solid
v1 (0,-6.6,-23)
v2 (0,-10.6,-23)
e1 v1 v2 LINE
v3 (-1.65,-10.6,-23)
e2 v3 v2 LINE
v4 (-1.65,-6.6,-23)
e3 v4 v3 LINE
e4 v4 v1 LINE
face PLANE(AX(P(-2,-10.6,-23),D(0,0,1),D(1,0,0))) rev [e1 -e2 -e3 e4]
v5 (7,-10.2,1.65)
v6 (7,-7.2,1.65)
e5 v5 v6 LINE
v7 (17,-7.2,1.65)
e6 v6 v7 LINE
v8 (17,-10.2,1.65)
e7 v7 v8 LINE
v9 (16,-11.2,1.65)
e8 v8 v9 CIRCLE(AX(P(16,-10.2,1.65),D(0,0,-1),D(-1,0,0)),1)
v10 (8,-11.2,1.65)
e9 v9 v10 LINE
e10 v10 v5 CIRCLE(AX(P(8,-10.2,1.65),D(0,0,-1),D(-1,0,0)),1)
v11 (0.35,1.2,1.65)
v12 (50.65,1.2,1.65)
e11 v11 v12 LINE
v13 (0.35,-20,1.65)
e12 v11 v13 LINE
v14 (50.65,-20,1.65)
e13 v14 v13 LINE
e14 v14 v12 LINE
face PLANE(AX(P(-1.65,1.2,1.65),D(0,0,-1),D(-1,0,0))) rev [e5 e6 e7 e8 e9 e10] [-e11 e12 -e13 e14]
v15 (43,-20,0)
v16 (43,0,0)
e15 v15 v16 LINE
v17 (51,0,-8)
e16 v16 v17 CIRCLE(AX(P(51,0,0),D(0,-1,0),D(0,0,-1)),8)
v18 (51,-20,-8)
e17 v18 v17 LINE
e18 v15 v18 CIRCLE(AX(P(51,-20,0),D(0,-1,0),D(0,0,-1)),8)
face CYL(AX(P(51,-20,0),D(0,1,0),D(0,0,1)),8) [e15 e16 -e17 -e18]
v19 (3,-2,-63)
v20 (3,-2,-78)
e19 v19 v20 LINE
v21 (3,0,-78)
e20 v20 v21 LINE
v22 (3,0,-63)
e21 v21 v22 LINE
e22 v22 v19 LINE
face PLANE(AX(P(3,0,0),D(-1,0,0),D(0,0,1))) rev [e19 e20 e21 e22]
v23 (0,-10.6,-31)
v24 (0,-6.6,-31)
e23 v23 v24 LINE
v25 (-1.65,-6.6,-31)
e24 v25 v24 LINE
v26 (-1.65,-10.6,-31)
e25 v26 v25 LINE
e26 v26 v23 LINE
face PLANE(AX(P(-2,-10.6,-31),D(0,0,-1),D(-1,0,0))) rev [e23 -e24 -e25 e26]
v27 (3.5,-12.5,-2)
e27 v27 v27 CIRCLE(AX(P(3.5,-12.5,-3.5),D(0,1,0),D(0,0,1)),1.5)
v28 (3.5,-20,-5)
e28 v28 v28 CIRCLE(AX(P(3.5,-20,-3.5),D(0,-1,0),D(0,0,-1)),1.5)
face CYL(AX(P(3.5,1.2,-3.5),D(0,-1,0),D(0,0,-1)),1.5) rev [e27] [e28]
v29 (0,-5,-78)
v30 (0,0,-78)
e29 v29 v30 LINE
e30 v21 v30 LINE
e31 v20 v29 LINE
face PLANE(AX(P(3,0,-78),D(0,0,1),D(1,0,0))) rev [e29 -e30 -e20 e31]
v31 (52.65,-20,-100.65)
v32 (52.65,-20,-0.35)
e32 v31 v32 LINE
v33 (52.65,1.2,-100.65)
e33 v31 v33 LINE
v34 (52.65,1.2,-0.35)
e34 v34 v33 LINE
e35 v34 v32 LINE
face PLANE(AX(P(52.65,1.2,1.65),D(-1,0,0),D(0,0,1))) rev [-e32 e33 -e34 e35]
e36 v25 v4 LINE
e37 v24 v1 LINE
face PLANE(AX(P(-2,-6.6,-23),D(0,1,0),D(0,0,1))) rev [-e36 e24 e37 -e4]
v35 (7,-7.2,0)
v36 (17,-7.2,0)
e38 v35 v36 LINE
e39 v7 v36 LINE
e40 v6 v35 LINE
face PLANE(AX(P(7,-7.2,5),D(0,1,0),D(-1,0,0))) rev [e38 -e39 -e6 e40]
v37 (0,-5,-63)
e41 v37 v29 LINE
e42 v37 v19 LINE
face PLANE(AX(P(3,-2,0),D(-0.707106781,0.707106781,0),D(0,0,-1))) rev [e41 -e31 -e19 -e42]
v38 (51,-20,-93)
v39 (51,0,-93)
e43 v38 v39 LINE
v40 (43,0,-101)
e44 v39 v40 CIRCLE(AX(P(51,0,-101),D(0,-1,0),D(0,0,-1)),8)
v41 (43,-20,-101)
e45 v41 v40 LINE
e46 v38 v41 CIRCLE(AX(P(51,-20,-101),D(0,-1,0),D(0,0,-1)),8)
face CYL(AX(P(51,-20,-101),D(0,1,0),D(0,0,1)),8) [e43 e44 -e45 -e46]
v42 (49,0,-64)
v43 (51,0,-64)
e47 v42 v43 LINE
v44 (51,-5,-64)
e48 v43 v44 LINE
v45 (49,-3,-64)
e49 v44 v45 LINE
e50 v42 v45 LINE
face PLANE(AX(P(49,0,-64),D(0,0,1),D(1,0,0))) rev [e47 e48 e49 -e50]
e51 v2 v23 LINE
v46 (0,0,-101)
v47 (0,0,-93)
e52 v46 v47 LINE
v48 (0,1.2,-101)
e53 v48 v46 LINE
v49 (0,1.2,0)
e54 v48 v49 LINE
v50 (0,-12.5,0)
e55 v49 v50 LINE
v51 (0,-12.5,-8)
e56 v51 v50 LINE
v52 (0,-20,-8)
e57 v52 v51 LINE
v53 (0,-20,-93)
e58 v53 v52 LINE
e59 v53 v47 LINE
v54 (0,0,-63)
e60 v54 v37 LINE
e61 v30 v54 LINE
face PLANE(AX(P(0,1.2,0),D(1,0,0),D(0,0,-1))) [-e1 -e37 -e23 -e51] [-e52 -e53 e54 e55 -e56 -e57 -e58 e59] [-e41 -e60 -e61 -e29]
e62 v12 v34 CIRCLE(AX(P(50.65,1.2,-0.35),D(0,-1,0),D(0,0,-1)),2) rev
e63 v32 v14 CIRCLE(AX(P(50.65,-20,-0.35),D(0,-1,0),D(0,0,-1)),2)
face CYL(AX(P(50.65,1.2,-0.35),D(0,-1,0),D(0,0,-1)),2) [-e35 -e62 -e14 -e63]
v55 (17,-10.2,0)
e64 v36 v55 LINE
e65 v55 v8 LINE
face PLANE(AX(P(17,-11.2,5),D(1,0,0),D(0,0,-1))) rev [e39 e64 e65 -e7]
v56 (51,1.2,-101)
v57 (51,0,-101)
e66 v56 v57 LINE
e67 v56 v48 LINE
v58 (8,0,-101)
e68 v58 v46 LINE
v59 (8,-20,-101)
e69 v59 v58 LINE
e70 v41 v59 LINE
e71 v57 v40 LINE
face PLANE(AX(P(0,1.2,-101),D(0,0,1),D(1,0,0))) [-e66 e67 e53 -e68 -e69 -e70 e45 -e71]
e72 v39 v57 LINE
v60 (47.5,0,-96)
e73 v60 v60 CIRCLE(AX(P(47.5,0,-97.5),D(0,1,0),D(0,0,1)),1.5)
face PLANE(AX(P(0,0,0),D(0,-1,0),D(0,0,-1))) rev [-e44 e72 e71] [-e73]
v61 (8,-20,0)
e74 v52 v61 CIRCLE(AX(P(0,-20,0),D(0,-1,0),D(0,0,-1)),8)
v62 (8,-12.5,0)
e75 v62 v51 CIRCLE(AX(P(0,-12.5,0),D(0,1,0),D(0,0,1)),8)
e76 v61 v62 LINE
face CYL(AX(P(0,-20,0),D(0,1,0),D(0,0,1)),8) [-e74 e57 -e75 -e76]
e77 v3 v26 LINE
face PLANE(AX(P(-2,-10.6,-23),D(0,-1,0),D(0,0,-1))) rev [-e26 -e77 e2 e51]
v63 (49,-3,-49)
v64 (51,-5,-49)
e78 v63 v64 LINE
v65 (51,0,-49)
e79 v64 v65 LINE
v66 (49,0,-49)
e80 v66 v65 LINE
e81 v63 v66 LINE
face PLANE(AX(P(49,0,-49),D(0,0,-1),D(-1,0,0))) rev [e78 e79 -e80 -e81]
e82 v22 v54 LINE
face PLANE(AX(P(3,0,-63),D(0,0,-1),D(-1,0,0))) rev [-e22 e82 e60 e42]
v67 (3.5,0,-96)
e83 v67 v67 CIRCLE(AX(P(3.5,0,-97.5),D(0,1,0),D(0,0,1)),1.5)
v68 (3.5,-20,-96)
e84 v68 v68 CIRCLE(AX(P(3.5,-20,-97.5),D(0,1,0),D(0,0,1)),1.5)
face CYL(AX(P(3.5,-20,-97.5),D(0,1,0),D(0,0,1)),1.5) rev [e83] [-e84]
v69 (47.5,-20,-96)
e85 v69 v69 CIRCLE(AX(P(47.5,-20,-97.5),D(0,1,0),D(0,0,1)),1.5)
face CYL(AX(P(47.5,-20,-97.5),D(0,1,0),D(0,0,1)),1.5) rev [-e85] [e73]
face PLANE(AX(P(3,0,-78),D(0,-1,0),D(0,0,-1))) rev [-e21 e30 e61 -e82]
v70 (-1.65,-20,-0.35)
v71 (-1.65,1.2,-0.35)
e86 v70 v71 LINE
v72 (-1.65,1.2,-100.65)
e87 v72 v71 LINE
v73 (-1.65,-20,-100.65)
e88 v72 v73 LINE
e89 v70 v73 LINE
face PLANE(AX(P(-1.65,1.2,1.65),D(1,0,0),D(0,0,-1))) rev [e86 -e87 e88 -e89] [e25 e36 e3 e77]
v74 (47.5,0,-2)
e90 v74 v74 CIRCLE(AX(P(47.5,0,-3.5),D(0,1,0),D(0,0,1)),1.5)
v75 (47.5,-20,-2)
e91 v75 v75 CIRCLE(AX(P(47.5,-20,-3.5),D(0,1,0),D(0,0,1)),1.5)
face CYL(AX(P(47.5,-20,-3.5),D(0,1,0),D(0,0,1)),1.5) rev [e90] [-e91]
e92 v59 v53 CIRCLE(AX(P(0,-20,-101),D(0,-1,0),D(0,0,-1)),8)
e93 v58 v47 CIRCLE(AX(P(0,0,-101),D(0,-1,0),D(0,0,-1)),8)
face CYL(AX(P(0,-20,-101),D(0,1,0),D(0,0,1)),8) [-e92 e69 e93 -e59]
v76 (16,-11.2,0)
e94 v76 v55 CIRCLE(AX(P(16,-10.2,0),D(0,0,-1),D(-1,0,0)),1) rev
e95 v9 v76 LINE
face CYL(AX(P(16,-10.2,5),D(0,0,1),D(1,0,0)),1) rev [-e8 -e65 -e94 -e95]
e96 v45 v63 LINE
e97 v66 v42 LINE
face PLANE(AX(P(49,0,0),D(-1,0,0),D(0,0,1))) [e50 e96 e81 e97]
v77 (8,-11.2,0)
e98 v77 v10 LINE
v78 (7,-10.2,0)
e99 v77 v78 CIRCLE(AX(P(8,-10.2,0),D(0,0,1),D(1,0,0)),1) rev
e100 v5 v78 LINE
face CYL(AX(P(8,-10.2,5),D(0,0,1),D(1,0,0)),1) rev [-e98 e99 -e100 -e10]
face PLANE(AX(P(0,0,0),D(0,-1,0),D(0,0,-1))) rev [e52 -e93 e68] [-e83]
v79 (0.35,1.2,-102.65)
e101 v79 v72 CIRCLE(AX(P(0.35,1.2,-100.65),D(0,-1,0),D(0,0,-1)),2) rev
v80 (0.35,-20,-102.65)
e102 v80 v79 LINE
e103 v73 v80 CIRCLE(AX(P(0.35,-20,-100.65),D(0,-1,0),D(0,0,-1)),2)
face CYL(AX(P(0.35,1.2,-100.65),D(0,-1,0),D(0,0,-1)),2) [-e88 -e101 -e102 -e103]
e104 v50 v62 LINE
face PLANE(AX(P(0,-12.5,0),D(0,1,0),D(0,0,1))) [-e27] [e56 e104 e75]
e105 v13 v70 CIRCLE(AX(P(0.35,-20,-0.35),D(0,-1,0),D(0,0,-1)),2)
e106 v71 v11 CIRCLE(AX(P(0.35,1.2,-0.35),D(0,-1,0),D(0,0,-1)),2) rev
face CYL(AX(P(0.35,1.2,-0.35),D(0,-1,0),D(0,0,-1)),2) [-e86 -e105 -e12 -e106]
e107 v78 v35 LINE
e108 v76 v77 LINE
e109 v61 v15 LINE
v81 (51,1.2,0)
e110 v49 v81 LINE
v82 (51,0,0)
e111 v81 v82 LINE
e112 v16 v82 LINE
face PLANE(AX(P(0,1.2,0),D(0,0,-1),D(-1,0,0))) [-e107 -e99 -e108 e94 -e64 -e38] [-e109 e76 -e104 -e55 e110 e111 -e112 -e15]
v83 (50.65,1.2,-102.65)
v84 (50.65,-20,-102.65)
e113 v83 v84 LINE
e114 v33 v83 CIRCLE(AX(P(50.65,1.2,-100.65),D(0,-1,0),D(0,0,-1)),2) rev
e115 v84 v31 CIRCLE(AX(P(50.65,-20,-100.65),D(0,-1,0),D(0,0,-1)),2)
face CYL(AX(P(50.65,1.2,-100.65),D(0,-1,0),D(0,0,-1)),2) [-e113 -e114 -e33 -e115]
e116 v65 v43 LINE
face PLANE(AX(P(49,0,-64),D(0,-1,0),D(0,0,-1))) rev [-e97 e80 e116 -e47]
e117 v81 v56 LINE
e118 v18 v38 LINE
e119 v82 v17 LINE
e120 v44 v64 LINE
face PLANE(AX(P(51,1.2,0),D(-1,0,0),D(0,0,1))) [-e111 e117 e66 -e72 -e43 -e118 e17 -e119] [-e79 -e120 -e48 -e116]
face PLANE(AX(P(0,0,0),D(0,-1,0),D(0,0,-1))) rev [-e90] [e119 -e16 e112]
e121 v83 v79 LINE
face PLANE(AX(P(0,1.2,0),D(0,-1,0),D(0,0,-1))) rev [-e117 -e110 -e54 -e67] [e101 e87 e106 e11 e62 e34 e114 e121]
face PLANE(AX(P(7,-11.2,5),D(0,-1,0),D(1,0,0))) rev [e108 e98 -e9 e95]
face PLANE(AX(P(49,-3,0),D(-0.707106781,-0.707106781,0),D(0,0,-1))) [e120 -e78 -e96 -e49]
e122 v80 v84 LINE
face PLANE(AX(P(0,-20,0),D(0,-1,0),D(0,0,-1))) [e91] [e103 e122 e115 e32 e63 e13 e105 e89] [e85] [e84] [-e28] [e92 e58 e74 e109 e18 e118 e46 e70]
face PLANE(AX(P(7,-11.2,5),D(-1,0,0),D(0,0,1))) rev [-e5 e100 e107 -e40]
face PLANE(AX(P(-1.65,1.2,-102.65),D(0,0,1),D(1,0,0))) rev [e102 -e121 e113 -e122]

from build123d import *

# Parameters (mm, degrees)
SKICA1_W                 = 54.3
SKICA1_H                 = 104.3
SKICA1_W_2               = 51
SKICA1_H_2               = 101
P_IDAT_VYSUNUT_M1_DEPTH  = 1.2
SKICA2_W                 = 54.3
SKICA2_H                 = 104.3
P_IDAT_VYSUNUT_M2_DEPTH  = 20
SKICA3_R                 = 1.5
ODEBRAT_VYSUNUT_M1_DEPTH = 118.085631057
SKICA5_W                 = 8
SKICA5_H                 = 4
ODEBRAT_VYSUNUT_M2_DEPTH = 2
SKICA6_W                 = 10
SKICA6_H                 = 4
ODEBRAT_VYSUNUT_M3_DEPTH = 5
SKICA9_W                 = 15
SKICA9_H                 = 5
P_IDAT_VYSUNUT_M4_DEPTH  = 2
ZKOSEN_1_SIZE            = 2
SKICA10_W                = 15
SKICA10_H                = 5
P_IDAT_VYSUNUT_M5_DEPTH  = 3
ZKOSEN_2_SIZE            = 3
ZAOBLIT2_R               = 1
ZAOBLIT3_R               = 2
ODEBRAT_VYSUNUT_M5_DEPTH = 12.5
SKICA12_R                = 1.5
ODEBRAT_VYSUNUT_M6_DEPTH = 118.296568577


with BuildPart() as part:
    # Skica1 → Přidat vysunutím1 (new body)
    with BuildSketch(Plane(origin=(0, 0, 0), x_dir=(1, 0, 0), z_dir=(0, 1, 0))):
        with Locations((25.5, 50.5)):
            Rectangle(SKICA1_W, SKICA1_H)
        with Locations((25.5, 50.5)):
            Rectangle(SKICA1_W_2, SKICA1_H_2, mode=Mode.SUBTRACT)
    extrude(amount=P_IDAT_VYSUNUT_M1_DEPTH)

    # Skica2 → Přidat vysunutím2 (add)
    # profile 1 of 5: a face of its own
    with BuildSketch(Plane.XZ):
        with Locations((25.5, -50.5)):
            Rectangle(SKICA2_W, SKICA2_H)
        Polygon((0, -8), (0, 0), (8, 0), (43, 0), (51, 0), (51, -8), (51, -93), (51, -101), (43, -101), (8, -101), (0, -101), (0, -93), align=None, mode=Mode.SUBTRACT)
    # profile 2 of 5: a face of its own
    with BuildSketch(Plane.XZ):
        with BuildLine():
            Line((8, 0), (0, 0))
            Line((0, 0), (0, -8))
            ThreePointArc((0, -8), (5.656854249, -5.656854249), (8, 0))
        make_face()
    # profile 3 of 5: a face of its own
    with BuildSketch(Plane.XZ):
        with BuildLine():
            ThreePointArc((8, -101), (5.656854249, -95.343145751), (0, -93))
            Line((0, -93), (0, -101))
            Line((0, -101), (8, -101))
        make_face()
    # profile 4 of 5: a face of its own
    with BuildSketch(Plane.XZ):
        with BuildLine():
            Line((51, -101), (51, -93))
            ThreePointArc((51, -93), (45.343145751, -95.343145751), (43, -101))
            Line((43, -101), (51, -101))
        make_face()
    # profile 5 of 5: a face of its own
    with BuildSketch(Plane.XZ):
        with BuildLine():
            Line((51, 0), (43, 0))
            ThreePointArc((43, 0), (45.343145751, -5.656854249), (51, -8))
            Line((51, -8), (51, 0))
        make_face()
    extrude(amount=P_IDAT_VYSUNUT_M2_DEPTH)

    # Skica3 → Odebrat vysunutím1 (cut, through all)
    with BuildSketch(Plane(origin=(0, 0, 0), x_dir=(1, 0, 0), z_dir=(0, 1, 0))):
        with Locations(Location((3.5, 97.5, 0), (0, 0, 270))):
            Circle(SKICA3_R)
        with Locations(Location((47.5, 97.5, 0), (0, 0, 270))):
            Circle(SKICA3_R)
        with Locations(Location((47.5, 3.5, 0), (0, 0, 270))):
            Circle(SKICA3_R)
    extrude(amount=-ODEBRAT_VYSUNUT_M1_DEPTH, mode=Mode.SUBTRACT)

    # Skica5 → Odebrat vysunutím2 (cut)
    with BuildSketch(Plane(origin=(0, 0, 0), x_dir=(0, 0, -1), z_dir=(1, 0, 0))):
        with Locations((27, -8.6)):
            Rectangle(SKICA5_W, SKICA5_H)
    extrude(amount=-ODEBRAT_VYSUNUT_M2_DEPTH, mode=Mode.SUBTRACT)

    # Skica6 → Odebrat vysunutím3 (cut, symmetric)
    with BuildSketch(Plane(origin=(0, 0, 0), x_dir=(-1, 0, 0), z_dir=(0, 0, -1))):
        with Locations((-12, -9.2)):
            Rectangle(SKICA6_W, SKICA6_H)
    extrude(amount=ODEBRAT_VYSUNUT_M3_DEPTH, both=True, mode=Mode.SUBTRACT)

    # Skica9 → Přidat vysunutím4 (add)
    with BuildSketch(Plane.ZY.offset(-51)):
        with Locations((-56.5, -2.5)):
            Rectangle(SKICA9_W, SKICA9_H)
    extrude(amount=P_IDAT_VYSUNUT_M4_DEPTH)

    # Zkosení1
    zkosen_1_edges = [part.edges().sort_by_distance(p)[0] for p in [
        (49, -5, -56.5),
    ]]
    chamfer(zkosen_1_edges, length=ZKOSEN_1_SIZE - 0.0001)  # a hair under: the kernel refuses the full size

    # Skica10 → Přidat vysunutím5 (add)
    with BuildSketch(Plane(origin=(0, 0, 0), x_dir=(0, 0, -1), z_dir=(1, 0, 0))):
        with Locations((70.5, -2.5)):
            Rectangle(SKICA10_W, SKICA10_H)
    extrude(amount=P_IDAT_VYSUNUT_M5_DEPTH)

    # Zkosení2
    zkosen_2_edges = [part.edges().sort_by_distance(p)[0] for p in [
        (3, -5, -70.5),
    ]]
    chamfer(zkosen_2_edges, length=ZKOSEN_2_SIZE - 0.0001)  # a hair under: the kernel refuses the full size

    # Zaoblit2
    zaoblit2_edges = [part.edges().sort_by_distance(p)[0] for p in [
        (7, -11.2, -1.111491673),
        (17, -11.2, 0.825),
    ]]
    fillet(zaoblit2_edges, radius=ZAOBLIT2_R)

    # Zaoblit3
    zaoblit3_edges = [part.edges().sort_by_distance(p)[0] for p in [
        (-1.65, -9.4, -102.65),
        (52.65, -9.4, -102.65),
        (52.65, -9.4, 1.65),
        (-1.65, -9.4, 1.65),
    ]]
    fillet(zaoblit3_edges, radius=ZAOBLIT3_R)

    # Skica11 → Odebrat vysunutím5 (cut)
    with BuildSketch(Plane(origin=(0, 0, 0), x_dir=(1, 0, 0), z_dir=(0, 1, 0))):
        with BuildLine():
            Line((0, 8), (0, 0))
            Line((0, 0), (8, 0))
            ThreePointArc((8, 0), (5.656854249, 5.656854249), (0, 8))
        make_face()
    extrude(amount=-ODEBRAT_VYSUNUT_M5_DEPTH, mode=Mode.SUBTRACT)

    # Skica12 → Odebrat vysunutím6 (cut, through all)
    with BuildSketch(Plane.XZ.offset(20)):
        with Locations(Location((3.5, -3.5, 0), (0, 0, 270))):
            Circle(SKICA12_R)
    extrude(amount=-ODEBRAT_VYSUNUT_M6_DEPTH, mode=Mode.SUBTRACT)


solid = part.part
